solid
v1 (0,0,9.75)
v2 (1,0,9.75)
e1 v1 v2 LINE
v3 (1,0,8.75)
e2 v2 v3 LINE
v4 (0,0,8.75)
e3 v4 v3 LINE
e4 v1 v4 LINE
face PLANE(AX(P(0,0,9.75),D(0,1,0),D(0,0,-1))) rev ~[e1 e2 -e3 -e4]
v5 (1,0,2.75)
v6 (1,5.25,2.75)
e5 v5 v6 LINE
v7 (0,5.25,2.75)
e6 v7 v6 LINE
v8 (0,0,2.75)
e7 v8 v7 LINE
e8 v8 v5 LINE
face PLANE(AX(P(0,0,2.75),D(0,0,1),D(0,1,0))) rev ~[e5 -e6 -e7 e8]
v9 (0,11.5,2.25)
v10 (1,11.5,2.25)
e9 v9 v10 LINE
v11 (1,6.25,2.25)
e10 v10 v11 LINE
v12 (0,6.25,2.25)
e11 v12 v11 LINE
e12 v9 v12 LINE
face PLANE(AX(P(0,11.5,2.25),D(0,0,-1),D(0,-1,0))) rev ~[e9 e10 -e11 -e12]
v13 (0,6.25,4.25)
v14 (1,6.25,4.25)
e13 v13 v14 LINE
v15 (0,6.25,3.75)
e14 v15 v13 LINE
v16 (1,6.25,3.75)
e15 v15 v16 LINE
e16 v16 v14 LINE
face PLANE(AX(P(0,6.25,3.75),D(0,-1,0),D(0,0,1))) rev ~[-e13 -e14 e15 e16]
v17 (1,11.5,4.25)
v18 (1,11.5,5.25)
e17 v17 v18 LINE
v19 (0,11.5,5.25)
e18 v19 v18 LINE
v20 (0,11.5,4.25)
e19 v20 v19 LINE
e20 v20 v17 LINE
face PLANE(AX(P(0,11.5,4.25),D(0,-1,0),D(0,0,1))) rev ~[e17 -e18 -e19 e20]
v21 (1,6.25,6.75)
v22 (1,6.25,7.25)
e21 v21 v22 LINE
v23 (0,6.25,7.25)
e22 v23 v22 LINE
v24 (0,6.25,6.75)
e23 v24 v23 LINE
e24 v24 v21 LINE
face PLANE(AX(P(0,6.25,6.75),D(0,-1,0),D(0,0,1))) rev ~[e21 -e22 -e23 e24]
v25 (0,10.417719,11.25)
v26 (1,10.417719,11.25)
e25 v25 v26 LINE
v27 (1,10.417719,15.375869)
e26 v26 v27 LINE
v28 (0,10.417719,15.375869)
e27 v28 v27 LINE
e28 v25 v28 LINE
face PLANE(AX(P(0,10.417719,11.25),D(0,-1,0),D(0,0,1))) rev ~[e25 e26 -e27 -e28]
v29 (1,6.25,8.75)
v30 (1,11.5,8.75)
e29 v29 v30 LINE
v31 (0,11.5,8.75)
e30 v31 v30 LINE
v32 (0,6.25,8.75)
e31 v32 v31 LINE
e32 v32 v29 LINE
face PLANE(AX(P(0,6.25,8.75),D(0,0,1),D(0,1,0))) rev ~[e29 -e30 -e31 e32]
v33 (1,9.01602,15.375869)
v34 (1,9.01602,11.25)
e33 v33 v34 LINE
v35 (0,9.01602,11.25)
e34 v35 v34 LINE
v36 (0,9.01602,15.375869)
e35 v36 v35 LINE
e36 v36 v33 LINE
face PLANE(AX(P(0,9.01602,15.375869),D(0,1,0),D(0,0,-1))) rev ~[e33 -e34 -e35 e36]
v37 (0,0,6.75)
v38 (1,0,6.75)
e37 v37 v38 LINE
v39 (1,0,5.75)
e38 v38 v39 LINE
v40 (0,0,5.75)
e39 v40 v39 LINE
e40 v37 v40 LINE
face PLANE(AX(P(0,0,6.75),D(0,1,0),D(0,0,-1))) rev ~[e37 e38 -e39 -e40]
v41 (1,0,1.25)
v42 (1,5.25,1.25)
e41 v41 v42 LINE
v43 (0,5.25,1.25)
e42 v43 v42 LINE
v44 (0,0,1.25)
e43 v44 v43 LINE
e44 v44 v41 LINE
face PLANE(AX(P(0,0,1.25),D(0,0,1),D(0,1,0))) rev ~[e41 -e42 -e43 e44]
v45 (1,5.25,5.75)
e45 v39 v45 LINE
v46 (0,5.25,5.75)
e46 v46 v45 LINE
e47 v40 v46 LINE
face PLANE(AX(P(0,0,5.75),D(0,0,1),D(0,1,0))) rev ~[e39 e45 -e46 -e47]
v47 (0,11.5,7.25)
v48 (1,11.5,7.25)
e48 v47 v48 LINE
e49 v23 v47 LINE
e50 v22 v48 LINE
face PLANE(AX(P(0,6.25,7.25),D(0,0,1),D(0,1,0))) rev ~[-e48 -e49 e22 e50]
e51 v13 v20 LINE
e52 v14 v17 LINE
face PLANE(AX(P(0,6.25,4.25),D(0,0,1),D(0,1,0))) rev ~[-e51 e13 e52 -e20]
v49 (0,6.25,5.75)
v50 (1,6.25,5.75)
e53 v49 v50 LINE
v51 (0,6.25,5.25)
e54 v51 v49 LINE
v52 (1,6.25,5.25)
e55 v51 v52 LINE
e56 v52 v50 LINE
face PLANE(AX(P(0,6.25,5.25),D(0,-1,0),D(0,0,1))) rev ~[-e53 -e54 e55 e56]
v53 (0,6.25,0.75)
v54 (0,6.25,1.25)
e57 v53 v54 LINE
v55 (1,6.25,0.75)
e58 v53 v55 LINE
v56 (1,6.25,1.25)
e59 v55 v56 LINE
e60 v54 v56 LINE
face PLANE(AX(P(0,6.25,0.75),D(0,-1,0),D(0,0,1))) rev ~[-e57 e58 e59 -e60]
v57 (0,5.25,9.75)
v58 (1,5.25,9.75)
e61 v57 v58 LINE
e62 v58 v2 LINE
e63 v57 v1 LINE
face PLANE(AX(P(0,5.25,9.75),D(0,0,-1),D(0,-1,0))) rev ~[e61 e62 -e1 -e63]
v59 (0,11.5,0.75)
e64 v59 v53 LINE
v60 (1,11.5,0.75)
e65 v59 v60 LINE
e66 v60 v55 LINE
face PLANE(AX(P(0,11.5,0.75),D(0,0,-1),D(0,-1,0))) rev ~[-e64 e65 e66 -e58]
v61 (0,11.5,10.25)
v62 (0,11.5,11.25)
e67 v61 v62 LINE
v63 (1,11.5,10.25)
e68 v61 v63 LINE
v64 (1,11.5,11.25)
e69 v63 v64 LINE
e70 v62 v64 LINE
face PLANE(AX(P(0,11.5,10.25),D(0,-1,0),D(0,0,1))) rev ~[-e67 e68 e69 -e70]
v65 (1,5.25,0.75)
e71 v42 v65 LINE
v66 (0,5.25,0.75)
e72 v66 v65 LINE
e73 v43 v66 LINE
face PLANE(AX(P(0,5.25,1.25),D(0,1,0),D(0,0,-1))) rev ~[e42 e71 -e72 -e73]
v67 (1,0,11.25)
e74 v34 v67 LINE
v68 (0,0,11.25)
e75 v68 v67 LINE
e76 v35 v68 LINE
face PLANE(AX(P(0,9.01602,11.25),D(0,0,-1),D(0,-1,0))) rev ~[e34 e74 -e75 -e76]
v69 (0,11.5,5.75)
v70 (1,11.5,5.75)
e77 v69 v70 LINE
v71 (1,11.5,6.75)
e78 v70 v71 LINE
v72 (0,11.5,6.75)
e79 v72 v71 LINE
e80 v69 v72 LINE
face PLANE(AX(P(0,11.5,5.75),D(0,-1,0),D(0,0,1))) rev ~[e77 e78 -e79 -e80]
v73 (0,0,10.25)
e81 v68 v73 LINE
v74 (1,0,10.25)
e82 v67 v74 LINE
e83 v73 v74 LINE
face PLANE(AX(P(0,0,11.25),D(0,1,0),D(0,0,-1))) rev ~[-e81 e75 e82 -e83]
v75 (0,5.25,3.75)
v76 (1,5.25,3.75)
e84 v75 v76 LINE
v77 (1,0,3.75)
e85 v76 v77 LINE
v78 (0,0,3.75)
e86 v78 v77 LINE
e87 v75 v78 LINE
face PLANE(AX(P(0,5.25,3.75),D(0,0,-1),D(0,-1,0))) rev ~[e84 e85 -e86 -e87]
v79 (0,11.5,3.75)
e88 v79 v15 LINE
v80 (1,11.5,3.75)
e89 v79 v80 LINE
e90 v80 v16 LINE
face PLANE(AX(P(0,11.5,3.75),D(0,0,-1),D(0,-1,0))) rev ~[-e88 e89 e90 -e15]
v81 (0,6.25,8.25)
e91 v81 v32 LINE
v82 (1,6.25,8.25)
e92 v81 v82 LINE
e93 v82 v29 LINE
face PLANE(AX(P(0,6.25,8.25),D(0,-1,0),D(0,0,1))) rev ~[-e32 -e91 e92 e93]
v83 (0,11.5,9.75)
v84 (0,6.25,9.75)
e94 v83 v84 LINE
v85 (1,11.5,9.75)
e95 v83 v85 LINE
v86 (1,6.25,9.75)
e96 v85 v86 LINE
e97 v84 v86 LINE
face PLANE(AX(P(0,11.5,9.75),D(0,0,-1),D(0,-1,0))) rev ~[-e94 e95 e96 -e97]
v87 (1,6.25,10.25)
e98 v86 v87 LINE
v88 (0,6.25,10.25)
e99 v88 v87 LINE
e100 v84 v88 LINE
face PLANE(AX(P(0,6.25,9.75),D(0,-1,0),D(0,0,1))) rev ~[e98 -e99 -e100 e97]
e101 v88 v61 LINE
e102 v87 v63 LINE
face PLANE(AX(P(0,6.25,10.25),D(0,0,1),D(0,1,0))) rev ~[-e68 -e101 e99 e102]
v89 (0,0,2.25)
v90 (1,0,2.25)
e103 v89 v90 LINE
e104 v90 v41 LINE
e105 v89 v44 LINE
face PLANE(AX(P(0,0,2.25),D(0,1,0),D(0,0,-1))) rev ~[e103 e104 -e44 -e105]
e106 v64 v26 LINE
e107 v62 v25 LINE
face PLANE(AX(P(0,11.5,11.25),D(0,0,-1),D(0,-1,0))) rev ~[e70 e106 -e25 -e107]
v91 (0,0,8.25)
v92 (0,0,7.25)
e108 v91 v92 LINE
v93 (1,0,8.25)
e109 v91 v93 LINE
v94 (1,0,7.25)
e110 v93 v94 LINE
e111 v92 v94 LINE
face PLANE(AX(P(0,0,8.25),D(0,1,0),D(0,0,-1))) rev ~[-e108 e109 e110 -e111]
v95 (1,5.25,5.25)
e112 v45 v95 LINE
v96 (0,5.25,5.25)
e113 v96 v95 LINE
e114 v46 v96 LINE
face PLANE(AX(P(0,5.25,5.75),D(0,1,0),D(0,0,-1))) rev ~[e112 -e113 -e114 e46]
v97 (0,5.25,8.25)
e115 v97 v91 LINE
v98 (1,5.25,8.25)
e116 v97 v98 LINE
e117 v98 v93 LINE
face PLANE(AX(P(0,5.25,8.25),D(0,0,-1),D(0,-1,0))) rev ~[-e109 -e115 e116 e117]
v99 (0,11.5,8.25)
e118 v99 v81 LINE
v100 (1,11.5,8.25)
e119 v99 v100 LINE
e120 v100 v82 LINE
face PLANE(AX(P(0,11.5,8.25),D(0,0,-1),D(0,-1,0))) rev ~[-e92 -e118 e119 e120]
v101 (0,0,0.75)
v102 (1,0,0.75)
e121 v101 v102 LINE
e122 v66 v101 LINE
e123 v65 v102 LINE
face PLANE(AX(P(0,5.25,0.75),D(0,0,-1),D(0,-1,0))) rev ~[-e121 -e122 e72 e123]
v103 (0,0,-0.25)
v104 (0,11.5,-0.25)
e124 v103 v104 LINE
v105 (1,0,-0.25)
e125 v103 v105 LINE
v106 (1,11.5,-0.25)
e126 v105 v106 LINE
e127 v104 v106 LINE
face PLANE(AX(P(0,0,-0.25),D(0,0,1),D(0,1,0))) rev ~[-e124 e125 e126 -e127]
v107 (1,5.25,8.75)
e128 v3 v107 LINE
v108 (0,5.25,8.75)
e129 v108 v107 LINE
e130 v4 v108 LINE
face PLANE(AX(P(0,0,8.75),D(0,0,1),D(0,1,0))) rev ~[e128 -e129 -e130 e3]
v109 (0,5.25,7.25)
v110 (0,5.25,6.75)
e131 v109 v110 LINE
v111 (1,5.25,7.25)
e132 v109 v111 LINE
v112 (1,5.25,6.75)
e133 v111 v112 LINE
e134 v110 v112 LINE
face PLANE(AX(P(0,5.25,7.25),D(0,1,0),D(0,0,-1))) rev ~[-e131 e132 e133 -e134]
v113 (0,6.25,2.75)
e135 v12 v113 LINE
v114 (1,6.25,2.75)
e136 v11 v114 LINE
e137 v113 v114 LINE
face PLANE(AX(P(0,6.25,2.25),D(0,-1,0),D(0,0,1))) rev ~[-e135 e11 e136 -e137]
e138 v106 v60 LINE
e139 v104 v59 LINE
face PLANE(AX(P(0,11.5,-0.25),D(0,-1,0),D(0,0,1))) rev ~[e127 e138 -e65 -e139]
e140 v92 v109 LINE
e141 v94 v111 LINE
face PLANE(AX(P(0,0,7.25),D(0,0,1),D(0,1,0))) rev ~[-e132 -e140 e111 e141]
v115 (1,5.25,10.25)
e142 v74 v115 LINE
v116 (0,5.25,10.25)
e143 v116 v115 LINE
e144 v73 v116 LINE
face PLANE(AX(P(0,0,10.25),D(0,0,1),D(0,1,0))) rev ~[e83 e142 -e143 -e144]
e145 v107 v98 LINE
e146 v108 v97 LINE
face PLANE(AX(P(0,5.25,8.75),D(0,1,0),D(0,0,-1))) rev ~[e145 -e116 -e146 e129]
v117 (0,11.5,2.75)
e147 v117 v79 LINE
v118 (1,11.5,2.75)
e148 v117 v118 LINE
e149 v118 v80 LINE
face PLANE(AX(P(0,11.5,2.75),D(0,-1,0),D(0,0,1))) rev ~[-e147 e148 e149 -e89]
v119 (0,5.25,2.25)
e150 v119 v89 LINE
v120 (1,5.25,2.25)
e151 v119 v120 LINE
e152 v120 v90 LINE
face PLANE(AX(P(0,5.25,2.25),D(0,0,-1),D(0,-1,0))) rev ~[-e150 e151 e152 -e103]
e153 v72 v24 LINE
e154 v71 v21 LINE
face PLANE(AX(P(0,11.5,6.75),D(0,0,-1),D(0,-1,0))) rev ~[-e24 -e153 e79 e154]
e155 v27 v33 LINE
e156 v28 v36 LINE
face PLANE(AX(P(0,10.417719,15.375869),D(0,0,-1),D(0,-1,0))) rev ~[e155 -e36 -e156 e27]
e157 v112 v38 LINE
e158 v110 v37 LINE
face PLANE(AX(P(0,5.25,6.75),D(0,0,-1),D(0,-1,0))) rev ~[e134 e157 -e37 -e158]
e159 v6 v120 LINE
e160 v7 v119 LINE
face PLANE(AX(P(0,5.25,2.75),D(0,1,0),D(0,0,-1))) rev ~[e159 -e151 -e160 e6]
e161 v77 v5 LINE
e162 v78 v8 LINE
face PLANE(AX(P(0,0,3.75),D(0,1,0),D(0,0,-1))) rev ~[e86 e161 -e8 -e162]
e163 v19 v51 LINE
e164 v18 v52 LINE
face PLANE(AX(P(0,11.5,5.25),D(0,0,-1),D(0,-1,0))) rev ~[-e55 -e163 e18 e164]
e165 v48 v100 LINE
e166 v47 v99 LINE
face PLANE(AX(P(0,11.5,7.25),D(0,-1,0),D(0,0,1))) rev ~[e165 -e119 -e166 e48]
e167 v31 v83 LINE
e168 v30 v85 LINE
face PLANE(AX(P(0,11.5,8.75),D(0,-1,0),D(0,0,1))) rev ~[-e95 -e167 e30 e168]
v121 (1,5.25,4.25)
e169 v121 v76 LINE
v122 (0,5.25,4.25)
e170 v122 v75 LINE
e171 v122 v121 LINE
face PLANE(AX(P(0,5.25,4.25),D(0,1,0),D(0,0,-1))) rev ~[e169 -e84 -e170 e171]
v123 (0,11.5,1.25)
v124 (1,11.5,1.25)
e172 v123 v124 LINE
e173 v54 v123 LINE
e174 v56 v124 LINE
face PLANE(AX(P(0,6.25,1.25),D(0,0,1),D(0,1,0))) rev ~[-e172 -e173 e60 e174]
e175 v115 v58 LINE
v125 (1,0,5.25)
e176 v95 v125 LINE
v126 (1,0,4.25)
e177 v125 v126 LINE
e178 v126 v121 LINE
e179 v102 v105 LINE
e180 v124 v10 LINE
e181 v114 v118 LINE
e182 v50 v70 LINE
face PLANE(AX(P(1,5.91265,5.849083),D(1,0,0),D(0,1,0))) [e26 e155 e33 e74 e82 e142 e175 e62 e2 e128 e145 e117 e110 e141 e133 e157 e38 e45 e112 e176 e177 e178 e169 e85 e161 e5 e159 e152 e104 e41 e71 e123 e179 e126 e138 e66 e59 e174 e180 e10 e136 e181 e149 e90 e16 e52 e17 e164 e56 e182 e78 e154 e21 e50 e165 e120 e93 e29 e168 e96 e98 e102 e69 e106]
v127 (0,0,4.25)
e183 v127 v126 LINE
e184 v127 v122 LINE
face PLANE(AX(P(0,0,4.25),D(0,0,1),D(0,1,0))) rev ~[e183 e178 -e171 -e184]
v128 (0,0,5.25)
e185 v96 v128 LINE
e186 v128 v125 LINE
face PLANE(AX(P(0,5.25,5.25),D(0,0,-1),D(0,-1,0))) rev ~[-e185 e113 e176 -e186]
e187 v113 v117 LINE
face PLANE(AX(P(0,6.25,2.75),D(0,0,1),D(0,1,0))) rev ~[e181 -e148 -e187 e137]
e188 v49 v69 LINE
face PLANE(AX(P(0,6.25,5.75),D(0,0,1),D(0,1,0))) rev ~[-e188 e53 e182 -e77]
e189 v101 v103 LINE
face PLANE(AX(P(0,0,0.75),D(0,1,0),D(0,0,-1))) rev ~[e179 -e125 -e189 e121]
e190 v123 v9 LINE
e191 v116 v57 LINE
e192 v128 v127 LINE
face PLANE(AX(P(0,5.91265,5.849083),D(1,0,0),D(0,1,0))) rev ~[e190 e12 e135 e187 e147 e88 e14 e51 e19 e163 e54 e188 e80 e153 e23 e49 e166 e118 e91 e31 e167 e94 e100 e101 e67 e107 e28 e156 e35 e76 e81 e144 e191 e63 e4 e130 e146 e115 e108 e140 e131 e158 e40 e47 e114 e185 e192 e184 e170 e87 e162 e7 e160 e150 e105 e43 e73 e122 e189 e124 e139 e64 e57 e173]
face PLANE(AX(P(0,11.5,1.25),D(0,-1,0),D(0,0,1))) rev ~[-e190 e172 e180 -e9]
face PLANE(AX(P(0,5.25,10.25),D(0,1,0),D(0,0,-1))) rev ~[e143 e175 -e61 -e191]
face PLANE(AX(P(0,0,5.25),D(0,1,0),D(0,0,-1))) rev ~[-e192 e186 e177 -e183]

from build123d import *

# Parameters (mm, degrees)
F1_DEPTH = 1


# Not quite as in the source:
# - a feature names something its author has since deleted; it is built from what else it names


with BuildPart() as f1:
    # F0 (on Right) → F1 (new body)
    with BuildSketch(Plane.YZ):
        Polygon((0, 0.75), (0, 0), (0, -0.25), (11.5, -0.25), (11.5, 0), (11.5, 0.75), (11.25, 0.75), (6.25, 0.75), (6.25, 1.25), (11.25, 1.25), (11.5, 1.25), (11.5, 2.25), (11.25, 2.25), (6.25, 2.25), (6.25, 2.75), (11.25, 2.75), (11.5, 2.75), (11.5, 3.75), (11.25, 3.75), (6.25, 3.75), (6.25, 4.25), (11.25, 4.25), (11.5, 4.25), (11.5, 5.25), (11.25, 5.25), (6.25, 5.25), (6.25, 5.75), (11.25, 5.75), (11.5, 5.75), (11.5, 6.75), (11.25, 6.75), (6.25, 6.75), (6.25, 7.25), (11.25, 7.25), (11.5, 7.25), (11.5, 8.25), (11.25, 8.25), (6.25, 8.25), (6.25, 8.75), (11.25, 8.75), (11.5, 8.75), (11.5, 9.75), (11.25, 9.75), (6.25, 9.75), (6.25, 10.25), (11.25, 10.25), (11.5, 10.25), (11.5, 11.25), (10.4177193716, 11.25), (10.4177193716, 15.3758693486), (9.0160202235, 15.3758693486), (9.0160202235, 11.25), (0, 11.25), (0, 10.25), (0.25, 10.25), (5.25, 10.25), (5.25, 9.75), (0.25, 9.75), (0, 9.75), (0, 8.75), (0.25, 8.75), (5.25, 8.75), (5.25, 8.25), (0.25, 8.25), (0, 8.25), (0, 7.25), (0.25, 7.25), (5.25, 7.25), (5.25, 6.75), (0.25, 6.75), (0, 6.75), (0, 5.75), (0.25, 5.75), (5.25, 5.75), (5.25, 5.25), (0.25, 5.25), (0, 5.25), (0, 4.25), (0.25, 4.25), (5.25, 4.25), (5.25, 3.75), (0.25, 3.75), (0, 3.75), (0, 2.75), (0.25, 2.75), (5.25, 2.75), (5.25, 2.25), (0.25, 2.25), (0, 2.25), (0, 1.25), (0.25, 1.25), (5.25, 1.25), (5.25, 0.75), (0.25, 0.75), align=None)
    extrude(amount=F1_DEPTH)


solid = f1.part
